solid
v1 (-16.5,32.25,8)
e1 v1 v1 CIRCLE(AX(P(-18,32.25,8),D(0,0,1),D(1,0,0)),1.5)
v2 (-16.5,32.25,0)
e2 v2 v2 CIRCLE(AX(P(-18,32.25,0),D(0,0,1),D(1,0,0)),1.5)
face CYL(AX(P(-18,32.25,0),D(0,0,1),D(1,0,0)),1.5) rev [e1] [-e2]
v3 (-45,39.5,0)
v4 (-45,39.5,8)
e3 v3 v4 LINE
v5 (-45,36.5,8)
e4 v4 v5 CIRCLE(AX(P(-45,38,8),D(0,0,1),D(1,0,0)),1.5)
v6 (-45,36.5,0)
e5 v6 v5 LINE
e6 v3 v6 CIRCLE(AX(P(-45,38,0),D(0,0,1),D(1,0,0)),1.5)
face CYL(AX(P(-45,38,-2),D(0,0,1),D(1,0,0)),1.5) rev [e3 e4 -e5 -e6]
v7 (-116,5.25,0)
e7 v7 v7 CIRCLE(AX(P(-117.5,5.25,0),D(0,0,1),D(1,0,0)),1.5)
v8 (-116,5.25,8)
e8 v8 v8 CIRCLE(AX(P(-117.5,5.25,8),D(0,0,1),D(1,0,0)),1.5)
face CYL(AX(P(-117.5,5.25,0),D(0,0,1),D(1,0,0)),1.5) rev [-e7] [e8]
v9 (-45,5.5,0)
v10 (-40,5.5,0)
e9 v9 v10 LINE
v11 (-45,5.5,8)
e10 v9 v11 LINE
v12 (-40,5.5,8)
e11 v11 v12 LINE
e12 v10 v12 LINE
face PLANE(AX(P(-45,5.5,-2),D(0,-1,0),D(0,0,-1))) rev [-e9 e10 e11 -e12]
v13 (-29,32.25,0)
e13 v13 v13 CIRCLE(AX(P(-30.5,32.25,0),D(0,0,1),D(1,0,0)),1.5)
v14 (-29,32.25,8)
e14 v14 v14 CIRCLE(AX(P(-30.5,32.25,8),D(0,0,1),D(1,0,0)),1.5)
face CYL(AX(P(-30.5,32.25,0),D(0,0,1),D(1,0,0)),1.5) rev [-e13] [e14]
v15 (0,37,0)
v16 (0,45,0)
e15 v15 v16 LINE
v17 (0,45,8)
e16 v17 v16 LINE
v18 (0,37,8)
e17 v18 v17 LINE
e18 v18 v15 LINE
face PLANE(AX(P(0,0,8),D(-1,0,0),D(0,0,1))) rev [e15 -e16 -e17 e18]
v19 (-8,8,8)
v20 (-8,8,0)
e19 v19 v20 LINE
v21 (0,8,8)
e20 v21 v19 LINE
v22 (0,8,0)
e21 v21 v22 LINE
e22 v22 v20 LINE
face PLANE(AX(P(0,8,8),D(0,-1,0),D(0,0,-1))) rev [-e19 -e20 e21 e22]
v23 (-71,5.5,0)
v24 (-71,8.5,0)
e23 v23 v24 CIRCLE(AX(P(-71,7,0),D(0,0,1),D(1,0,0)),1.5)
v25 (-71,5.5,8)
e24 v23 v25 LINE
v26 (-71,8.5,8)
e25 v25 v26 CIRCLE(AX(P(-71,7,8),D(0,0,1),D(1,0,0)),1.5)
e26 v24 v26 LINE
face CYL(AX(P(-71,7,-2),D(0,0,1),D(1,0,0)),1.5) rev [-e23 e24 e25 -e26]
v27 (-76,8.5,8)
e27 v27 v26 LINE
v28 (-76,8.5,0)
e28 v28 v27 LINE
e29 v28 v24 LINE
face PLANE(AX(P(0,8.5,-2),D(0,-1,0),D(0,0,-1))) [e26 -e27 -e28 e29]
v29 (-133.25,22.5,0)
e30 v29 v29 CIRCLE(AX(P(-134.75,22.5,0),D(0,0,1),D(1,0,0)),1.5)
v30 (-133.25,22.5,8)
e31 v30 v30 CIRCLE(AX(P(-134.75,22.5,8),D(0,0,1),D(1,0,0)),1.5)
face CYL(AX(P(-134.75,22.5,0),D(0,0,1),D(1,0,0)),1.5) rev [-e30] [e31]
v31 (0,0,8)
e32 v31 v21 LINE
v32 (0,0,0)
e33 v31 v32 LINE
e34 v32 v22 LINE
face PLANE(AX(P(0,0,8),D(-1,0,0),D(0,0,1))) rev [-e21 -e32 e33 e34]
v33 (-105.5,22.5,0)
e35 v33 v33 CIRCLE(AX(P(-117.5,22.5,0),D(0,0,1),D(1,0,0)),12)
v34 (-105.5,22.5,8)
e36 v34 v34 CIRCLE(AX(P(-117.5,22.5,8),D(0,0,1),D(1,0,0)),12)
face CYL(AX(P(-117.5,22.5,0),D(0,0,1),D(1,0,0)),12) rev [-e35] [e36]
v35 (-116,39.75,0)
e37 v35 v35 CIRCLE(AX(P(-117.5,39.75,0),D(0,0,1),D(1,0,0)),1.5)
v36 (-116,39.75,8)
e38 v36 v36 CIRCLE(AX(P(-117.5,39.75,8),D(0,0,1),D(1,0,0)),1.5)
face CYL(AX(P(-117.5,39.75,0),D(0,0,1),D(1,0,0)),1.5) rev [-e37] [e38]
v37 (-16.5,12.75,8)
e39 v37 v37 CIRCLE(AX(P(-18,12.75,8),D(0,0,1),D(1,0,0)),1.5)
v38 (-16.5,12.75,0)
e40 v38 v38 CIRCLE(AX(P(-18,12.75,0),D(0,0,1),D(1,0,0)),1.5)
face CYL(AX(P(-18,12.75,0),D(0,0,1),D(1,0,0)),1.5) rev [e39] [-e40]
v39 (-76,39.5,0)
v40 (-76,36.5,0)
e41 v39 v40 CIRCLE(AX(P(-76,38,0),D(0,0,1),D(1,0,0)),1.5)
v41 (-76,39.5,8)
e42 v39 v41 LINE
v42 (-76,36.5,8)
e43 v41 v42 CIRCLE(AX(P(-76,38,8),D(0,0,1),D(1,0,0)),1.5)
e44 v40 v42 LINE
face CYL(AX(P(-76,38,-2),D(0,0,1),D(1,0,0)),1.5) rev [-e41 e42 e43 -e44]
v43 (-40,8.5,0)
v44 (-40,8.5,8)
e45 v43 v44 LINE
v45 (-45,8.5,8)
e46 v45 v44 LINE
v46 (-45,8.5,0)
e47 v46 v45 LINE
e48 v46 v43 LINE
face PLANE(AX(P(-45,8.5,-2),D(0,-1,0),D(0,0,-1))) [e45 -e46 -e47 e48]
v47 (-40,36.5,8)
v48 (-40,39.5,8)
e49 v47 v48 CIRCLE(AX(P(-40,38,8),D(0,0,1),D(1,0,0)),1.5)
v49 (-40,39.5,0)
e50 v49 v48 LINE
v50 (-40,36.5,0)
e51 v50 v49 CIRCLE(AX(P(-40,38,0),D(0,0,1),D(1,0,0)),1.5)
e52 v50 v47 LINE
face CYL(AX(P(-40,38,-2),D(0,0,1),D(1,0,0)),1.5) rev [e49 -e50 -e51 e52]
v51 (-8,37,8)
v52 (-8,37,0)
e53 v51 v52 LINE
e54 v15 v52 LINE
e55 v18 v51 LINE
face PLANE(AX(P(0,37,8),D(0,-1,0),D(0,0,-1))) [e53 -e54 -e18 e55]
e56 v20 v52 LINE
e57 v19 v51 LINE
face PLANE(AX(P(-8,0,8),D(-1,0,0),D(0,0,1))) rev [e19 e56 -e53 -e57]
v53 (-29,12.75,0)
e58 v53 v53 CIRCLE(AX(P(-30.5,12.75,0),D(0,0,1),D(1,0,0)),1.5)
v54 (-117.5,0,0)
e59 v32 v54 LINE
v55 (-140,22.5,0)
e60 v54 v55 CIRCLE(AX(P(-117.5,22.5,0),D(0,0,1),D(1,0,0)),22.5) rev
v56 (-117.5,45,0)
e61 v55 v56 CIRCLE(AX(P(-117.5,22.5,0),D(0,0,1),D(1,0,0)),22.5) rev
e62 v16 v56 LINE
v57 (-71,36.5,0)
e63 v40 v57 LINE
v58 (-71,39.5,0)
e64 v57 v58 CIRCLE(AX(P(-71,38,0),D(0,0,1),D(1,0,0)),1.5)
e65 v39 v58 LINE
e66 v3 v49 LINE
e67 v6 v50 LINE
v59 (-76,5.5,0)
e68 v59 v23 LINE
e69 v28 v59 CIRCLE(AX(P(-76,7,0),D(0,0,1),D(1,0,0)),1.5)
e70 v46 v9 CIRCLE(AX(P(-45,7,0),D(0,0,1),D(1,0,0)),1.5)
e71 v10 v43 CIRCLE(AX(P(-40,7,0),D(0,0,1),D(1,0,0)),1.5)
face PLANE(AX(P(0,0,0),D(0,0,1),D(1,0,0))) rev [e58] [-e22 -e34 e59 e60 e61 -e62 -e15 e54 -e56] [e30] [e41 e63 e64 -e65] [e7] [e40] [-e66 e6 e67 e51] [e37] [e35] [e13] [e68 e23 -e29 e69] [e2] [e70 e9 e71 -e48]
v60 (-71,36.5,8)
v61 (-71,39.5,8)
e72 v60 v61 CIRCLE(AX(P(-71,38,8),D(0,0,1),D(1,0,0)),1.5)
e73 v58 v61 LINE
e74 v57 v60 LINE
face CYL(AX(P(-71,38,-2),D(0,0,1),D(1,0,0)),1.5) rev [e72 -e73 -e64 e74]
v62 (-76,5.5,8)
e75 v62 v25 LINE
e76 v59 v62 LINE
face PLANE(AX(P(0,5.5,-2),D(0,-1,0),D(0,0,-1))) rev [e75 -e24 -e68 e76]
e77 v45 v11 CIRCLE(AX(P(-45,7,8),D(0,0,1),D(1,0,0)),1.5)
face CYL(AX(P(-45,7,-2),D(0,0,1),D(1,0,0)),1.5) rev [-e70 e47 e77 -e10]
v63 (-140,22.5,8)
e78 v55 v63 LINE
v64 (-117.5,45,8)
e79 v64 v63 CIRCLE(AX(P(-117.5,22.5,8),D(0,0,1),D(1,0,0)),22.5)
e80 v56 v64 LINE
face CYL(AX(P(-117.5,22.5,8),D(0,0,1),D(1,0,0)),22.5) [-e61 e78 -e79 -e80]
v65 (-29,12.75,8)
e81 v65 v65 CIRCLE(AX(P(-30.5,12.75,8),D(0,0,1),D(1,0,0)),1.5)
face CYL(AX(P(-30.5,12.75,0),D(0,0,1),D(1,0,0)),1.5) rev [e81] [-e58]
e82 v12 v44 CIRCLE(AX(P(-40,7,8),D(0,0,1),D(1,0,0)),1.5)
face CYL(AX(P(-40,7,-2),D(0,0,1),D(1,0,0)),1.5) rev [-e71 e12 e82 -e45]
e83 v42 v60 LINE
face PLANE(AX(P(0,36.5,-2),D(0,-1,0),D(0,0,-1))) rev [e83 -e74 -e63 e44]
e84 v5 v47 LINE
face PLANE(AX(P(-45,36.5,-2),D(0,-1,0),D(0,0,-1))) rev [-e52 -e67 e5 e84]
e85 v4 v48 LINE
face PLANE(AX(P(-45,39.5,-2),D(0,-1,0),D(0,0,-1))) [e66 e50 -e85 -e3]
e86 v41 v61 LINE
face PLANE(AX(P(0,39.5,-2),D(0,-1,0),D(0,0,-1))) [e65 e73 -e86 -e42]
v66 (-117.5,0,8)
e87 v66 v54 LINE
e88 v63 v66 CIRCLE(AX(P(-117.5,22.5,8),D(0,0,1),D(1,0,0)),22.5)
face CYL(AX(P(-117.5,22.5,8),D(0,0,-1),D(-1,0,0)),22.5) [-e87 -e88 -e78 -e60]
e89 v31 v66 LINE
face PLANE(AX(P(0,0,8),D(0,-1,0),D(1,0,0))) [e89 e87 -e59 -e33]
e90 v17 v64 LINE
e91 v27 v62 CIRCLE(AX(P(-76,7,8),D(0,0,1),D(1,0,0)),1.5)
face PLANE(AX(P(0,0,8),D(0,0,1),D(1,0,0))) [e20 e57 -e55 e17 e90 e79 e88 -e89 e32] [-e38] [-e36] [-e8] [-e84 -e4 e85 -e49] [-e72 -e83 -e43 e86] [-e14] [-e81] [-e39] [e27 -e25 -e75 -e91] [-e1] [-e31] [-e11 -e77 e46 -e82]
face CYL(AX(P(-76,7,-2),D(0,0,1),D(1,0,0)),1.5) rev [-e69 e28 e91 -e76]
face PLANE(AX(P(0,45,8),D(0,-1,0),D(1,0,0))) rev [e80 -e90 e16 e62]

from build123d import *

# Parameters (mm, degrees)
BOSS_EXTRUDE1_DEPTH = 8
SKETCH5_R           = 12
CUT_EXTRUDE4_DEPTH  = 8
FILLET6_R           = 22.5
SKETCH6_R           = 1.5
CUT_EXTRUDE5_DEPTH  = 8
CUT_EXTRUDE6_DEPTH  = 10
SKETCH11_R          = 1.5
CUT_EXTRUDE7_DEPTH  = 8


with BuildPart() as part:
    # Sketch1 → Boss-Extrude1 (new body)
    with BuildSketch(Plane.XY):
        Polygon((-8, 37), (0, 37), (0, 45), (-140, 45), (-140, 22.5), (-140, 0), (0, 0), (0, 8), (-8, 8), align=None)
    extrude(amount=BOSS_EXTRUDE1_DEPTH)

    # Sketch5 → Cut-Extrude4 (cut)
    with BuildSketch(Plane.XY.offset(8)):
        with Locations((-117.5, 22.5)):
            Circle(SKETCH5_R)
    extrude(amount=-CUT_EXTRUDE4_DEPTH, mode=Mode.SUBTRACT)

    # Fillet6
    fillet6_edges = [part.edges().sort_by_distance(p)[0] for p in [
        (-140, 45, 4),
        (-140, 0, 4),
    ]]
    fillet(fillet6_edges, radius=FILLET6_R - 0.0001)  # a hair under: the kernel refuses the full size

    # Sketch6 → Cut-Extrude5 (cut)
    with BuildSketch(Plane.XY.offset(8)):
        with Locations((-18, 12.75)):
            Circle(SKETCH6_R)
        with Locations((-18, 32.25)):
            Circle(SKETCH6_R)
        with Locations((-30.5, 32.25)):
            Circle(SKETCH6_R)
        with Locations((-30.5, 12.75)):
            Circle(SKETCH6_R)
    extrude(amount=-CUT_EXTRUDE5_DEPTH, mode=Mode.SUBTRACT)

    # Sketch7 → Cut-Extrude6 (cut)
    with BuildSketch(Plane.XY.offset(8)):
        with BuildLine():
            Line((-76, 39.5), (-71, 39.5))
            ThreePointArc((-71, 39.5), (-69.5, 38), (-71, 36.5))
            Line((-71, 36.5), (-76, 36.5))
            ThreePointArc((-76, 36.5), (-77.5, 38), (-76, 39.5))
        make_face()
        with BuildLine():
            Line((-45, 39.5), (-40, 39.5))
            ThreePointArc((-40, 39.5), (-38.5, 38), (-40, 36.5))
            Line((-40, 36.5), (-45, 36.5))
            ThreePointArc((-45, 36.5), (-46.5, 38), (-45, 39.5))
        make_face()
        with BuildLine():
            Line((-45, 8.5), (-40, 8.5))
            ThreePointArc((-40, 8.5), (-38.5, 7), (-40, 5.5))
            Line((-40, 5.5), (-45, 5.5))
            ThreePointArc((-45, 5.5), (-46.5, 7), (-45, 8.5))
        make_face()
        with BuildLine():
            Line((-76, 8.5), (-71, 8.5))
            ThreePointArc((-71, 8.5), (-69.5, 7), (-71, 5.5))
            Line((-71, 5.5), (-76, 5.5))
            ThreePointArc((-76, 5.5), (-77.5, 7), (-76, 8.5))
        make_face()
    extrude(amount=-CUT_EXTRUDE6_DEPTH, mode=Mode.SUBTRACT)

    # Sketch11 → Cut-Extrude7 (cut)
    with BuildSketch(Plane.XY.offset(8)):
        with Locations((-134.75, 22.5)):
            Circle(SKETCH11_R)
        with Locations((-117.5, 5.25)):
            Circle(SKETCH11_R)
        with Locations((-117.5, 39.75)):
            Circle(SKETCH11_R)
    extrude(amount=-CUT_EXTRUDE7_DEPTH, mode=Mode.SUBTRACT)


solid = part.part
